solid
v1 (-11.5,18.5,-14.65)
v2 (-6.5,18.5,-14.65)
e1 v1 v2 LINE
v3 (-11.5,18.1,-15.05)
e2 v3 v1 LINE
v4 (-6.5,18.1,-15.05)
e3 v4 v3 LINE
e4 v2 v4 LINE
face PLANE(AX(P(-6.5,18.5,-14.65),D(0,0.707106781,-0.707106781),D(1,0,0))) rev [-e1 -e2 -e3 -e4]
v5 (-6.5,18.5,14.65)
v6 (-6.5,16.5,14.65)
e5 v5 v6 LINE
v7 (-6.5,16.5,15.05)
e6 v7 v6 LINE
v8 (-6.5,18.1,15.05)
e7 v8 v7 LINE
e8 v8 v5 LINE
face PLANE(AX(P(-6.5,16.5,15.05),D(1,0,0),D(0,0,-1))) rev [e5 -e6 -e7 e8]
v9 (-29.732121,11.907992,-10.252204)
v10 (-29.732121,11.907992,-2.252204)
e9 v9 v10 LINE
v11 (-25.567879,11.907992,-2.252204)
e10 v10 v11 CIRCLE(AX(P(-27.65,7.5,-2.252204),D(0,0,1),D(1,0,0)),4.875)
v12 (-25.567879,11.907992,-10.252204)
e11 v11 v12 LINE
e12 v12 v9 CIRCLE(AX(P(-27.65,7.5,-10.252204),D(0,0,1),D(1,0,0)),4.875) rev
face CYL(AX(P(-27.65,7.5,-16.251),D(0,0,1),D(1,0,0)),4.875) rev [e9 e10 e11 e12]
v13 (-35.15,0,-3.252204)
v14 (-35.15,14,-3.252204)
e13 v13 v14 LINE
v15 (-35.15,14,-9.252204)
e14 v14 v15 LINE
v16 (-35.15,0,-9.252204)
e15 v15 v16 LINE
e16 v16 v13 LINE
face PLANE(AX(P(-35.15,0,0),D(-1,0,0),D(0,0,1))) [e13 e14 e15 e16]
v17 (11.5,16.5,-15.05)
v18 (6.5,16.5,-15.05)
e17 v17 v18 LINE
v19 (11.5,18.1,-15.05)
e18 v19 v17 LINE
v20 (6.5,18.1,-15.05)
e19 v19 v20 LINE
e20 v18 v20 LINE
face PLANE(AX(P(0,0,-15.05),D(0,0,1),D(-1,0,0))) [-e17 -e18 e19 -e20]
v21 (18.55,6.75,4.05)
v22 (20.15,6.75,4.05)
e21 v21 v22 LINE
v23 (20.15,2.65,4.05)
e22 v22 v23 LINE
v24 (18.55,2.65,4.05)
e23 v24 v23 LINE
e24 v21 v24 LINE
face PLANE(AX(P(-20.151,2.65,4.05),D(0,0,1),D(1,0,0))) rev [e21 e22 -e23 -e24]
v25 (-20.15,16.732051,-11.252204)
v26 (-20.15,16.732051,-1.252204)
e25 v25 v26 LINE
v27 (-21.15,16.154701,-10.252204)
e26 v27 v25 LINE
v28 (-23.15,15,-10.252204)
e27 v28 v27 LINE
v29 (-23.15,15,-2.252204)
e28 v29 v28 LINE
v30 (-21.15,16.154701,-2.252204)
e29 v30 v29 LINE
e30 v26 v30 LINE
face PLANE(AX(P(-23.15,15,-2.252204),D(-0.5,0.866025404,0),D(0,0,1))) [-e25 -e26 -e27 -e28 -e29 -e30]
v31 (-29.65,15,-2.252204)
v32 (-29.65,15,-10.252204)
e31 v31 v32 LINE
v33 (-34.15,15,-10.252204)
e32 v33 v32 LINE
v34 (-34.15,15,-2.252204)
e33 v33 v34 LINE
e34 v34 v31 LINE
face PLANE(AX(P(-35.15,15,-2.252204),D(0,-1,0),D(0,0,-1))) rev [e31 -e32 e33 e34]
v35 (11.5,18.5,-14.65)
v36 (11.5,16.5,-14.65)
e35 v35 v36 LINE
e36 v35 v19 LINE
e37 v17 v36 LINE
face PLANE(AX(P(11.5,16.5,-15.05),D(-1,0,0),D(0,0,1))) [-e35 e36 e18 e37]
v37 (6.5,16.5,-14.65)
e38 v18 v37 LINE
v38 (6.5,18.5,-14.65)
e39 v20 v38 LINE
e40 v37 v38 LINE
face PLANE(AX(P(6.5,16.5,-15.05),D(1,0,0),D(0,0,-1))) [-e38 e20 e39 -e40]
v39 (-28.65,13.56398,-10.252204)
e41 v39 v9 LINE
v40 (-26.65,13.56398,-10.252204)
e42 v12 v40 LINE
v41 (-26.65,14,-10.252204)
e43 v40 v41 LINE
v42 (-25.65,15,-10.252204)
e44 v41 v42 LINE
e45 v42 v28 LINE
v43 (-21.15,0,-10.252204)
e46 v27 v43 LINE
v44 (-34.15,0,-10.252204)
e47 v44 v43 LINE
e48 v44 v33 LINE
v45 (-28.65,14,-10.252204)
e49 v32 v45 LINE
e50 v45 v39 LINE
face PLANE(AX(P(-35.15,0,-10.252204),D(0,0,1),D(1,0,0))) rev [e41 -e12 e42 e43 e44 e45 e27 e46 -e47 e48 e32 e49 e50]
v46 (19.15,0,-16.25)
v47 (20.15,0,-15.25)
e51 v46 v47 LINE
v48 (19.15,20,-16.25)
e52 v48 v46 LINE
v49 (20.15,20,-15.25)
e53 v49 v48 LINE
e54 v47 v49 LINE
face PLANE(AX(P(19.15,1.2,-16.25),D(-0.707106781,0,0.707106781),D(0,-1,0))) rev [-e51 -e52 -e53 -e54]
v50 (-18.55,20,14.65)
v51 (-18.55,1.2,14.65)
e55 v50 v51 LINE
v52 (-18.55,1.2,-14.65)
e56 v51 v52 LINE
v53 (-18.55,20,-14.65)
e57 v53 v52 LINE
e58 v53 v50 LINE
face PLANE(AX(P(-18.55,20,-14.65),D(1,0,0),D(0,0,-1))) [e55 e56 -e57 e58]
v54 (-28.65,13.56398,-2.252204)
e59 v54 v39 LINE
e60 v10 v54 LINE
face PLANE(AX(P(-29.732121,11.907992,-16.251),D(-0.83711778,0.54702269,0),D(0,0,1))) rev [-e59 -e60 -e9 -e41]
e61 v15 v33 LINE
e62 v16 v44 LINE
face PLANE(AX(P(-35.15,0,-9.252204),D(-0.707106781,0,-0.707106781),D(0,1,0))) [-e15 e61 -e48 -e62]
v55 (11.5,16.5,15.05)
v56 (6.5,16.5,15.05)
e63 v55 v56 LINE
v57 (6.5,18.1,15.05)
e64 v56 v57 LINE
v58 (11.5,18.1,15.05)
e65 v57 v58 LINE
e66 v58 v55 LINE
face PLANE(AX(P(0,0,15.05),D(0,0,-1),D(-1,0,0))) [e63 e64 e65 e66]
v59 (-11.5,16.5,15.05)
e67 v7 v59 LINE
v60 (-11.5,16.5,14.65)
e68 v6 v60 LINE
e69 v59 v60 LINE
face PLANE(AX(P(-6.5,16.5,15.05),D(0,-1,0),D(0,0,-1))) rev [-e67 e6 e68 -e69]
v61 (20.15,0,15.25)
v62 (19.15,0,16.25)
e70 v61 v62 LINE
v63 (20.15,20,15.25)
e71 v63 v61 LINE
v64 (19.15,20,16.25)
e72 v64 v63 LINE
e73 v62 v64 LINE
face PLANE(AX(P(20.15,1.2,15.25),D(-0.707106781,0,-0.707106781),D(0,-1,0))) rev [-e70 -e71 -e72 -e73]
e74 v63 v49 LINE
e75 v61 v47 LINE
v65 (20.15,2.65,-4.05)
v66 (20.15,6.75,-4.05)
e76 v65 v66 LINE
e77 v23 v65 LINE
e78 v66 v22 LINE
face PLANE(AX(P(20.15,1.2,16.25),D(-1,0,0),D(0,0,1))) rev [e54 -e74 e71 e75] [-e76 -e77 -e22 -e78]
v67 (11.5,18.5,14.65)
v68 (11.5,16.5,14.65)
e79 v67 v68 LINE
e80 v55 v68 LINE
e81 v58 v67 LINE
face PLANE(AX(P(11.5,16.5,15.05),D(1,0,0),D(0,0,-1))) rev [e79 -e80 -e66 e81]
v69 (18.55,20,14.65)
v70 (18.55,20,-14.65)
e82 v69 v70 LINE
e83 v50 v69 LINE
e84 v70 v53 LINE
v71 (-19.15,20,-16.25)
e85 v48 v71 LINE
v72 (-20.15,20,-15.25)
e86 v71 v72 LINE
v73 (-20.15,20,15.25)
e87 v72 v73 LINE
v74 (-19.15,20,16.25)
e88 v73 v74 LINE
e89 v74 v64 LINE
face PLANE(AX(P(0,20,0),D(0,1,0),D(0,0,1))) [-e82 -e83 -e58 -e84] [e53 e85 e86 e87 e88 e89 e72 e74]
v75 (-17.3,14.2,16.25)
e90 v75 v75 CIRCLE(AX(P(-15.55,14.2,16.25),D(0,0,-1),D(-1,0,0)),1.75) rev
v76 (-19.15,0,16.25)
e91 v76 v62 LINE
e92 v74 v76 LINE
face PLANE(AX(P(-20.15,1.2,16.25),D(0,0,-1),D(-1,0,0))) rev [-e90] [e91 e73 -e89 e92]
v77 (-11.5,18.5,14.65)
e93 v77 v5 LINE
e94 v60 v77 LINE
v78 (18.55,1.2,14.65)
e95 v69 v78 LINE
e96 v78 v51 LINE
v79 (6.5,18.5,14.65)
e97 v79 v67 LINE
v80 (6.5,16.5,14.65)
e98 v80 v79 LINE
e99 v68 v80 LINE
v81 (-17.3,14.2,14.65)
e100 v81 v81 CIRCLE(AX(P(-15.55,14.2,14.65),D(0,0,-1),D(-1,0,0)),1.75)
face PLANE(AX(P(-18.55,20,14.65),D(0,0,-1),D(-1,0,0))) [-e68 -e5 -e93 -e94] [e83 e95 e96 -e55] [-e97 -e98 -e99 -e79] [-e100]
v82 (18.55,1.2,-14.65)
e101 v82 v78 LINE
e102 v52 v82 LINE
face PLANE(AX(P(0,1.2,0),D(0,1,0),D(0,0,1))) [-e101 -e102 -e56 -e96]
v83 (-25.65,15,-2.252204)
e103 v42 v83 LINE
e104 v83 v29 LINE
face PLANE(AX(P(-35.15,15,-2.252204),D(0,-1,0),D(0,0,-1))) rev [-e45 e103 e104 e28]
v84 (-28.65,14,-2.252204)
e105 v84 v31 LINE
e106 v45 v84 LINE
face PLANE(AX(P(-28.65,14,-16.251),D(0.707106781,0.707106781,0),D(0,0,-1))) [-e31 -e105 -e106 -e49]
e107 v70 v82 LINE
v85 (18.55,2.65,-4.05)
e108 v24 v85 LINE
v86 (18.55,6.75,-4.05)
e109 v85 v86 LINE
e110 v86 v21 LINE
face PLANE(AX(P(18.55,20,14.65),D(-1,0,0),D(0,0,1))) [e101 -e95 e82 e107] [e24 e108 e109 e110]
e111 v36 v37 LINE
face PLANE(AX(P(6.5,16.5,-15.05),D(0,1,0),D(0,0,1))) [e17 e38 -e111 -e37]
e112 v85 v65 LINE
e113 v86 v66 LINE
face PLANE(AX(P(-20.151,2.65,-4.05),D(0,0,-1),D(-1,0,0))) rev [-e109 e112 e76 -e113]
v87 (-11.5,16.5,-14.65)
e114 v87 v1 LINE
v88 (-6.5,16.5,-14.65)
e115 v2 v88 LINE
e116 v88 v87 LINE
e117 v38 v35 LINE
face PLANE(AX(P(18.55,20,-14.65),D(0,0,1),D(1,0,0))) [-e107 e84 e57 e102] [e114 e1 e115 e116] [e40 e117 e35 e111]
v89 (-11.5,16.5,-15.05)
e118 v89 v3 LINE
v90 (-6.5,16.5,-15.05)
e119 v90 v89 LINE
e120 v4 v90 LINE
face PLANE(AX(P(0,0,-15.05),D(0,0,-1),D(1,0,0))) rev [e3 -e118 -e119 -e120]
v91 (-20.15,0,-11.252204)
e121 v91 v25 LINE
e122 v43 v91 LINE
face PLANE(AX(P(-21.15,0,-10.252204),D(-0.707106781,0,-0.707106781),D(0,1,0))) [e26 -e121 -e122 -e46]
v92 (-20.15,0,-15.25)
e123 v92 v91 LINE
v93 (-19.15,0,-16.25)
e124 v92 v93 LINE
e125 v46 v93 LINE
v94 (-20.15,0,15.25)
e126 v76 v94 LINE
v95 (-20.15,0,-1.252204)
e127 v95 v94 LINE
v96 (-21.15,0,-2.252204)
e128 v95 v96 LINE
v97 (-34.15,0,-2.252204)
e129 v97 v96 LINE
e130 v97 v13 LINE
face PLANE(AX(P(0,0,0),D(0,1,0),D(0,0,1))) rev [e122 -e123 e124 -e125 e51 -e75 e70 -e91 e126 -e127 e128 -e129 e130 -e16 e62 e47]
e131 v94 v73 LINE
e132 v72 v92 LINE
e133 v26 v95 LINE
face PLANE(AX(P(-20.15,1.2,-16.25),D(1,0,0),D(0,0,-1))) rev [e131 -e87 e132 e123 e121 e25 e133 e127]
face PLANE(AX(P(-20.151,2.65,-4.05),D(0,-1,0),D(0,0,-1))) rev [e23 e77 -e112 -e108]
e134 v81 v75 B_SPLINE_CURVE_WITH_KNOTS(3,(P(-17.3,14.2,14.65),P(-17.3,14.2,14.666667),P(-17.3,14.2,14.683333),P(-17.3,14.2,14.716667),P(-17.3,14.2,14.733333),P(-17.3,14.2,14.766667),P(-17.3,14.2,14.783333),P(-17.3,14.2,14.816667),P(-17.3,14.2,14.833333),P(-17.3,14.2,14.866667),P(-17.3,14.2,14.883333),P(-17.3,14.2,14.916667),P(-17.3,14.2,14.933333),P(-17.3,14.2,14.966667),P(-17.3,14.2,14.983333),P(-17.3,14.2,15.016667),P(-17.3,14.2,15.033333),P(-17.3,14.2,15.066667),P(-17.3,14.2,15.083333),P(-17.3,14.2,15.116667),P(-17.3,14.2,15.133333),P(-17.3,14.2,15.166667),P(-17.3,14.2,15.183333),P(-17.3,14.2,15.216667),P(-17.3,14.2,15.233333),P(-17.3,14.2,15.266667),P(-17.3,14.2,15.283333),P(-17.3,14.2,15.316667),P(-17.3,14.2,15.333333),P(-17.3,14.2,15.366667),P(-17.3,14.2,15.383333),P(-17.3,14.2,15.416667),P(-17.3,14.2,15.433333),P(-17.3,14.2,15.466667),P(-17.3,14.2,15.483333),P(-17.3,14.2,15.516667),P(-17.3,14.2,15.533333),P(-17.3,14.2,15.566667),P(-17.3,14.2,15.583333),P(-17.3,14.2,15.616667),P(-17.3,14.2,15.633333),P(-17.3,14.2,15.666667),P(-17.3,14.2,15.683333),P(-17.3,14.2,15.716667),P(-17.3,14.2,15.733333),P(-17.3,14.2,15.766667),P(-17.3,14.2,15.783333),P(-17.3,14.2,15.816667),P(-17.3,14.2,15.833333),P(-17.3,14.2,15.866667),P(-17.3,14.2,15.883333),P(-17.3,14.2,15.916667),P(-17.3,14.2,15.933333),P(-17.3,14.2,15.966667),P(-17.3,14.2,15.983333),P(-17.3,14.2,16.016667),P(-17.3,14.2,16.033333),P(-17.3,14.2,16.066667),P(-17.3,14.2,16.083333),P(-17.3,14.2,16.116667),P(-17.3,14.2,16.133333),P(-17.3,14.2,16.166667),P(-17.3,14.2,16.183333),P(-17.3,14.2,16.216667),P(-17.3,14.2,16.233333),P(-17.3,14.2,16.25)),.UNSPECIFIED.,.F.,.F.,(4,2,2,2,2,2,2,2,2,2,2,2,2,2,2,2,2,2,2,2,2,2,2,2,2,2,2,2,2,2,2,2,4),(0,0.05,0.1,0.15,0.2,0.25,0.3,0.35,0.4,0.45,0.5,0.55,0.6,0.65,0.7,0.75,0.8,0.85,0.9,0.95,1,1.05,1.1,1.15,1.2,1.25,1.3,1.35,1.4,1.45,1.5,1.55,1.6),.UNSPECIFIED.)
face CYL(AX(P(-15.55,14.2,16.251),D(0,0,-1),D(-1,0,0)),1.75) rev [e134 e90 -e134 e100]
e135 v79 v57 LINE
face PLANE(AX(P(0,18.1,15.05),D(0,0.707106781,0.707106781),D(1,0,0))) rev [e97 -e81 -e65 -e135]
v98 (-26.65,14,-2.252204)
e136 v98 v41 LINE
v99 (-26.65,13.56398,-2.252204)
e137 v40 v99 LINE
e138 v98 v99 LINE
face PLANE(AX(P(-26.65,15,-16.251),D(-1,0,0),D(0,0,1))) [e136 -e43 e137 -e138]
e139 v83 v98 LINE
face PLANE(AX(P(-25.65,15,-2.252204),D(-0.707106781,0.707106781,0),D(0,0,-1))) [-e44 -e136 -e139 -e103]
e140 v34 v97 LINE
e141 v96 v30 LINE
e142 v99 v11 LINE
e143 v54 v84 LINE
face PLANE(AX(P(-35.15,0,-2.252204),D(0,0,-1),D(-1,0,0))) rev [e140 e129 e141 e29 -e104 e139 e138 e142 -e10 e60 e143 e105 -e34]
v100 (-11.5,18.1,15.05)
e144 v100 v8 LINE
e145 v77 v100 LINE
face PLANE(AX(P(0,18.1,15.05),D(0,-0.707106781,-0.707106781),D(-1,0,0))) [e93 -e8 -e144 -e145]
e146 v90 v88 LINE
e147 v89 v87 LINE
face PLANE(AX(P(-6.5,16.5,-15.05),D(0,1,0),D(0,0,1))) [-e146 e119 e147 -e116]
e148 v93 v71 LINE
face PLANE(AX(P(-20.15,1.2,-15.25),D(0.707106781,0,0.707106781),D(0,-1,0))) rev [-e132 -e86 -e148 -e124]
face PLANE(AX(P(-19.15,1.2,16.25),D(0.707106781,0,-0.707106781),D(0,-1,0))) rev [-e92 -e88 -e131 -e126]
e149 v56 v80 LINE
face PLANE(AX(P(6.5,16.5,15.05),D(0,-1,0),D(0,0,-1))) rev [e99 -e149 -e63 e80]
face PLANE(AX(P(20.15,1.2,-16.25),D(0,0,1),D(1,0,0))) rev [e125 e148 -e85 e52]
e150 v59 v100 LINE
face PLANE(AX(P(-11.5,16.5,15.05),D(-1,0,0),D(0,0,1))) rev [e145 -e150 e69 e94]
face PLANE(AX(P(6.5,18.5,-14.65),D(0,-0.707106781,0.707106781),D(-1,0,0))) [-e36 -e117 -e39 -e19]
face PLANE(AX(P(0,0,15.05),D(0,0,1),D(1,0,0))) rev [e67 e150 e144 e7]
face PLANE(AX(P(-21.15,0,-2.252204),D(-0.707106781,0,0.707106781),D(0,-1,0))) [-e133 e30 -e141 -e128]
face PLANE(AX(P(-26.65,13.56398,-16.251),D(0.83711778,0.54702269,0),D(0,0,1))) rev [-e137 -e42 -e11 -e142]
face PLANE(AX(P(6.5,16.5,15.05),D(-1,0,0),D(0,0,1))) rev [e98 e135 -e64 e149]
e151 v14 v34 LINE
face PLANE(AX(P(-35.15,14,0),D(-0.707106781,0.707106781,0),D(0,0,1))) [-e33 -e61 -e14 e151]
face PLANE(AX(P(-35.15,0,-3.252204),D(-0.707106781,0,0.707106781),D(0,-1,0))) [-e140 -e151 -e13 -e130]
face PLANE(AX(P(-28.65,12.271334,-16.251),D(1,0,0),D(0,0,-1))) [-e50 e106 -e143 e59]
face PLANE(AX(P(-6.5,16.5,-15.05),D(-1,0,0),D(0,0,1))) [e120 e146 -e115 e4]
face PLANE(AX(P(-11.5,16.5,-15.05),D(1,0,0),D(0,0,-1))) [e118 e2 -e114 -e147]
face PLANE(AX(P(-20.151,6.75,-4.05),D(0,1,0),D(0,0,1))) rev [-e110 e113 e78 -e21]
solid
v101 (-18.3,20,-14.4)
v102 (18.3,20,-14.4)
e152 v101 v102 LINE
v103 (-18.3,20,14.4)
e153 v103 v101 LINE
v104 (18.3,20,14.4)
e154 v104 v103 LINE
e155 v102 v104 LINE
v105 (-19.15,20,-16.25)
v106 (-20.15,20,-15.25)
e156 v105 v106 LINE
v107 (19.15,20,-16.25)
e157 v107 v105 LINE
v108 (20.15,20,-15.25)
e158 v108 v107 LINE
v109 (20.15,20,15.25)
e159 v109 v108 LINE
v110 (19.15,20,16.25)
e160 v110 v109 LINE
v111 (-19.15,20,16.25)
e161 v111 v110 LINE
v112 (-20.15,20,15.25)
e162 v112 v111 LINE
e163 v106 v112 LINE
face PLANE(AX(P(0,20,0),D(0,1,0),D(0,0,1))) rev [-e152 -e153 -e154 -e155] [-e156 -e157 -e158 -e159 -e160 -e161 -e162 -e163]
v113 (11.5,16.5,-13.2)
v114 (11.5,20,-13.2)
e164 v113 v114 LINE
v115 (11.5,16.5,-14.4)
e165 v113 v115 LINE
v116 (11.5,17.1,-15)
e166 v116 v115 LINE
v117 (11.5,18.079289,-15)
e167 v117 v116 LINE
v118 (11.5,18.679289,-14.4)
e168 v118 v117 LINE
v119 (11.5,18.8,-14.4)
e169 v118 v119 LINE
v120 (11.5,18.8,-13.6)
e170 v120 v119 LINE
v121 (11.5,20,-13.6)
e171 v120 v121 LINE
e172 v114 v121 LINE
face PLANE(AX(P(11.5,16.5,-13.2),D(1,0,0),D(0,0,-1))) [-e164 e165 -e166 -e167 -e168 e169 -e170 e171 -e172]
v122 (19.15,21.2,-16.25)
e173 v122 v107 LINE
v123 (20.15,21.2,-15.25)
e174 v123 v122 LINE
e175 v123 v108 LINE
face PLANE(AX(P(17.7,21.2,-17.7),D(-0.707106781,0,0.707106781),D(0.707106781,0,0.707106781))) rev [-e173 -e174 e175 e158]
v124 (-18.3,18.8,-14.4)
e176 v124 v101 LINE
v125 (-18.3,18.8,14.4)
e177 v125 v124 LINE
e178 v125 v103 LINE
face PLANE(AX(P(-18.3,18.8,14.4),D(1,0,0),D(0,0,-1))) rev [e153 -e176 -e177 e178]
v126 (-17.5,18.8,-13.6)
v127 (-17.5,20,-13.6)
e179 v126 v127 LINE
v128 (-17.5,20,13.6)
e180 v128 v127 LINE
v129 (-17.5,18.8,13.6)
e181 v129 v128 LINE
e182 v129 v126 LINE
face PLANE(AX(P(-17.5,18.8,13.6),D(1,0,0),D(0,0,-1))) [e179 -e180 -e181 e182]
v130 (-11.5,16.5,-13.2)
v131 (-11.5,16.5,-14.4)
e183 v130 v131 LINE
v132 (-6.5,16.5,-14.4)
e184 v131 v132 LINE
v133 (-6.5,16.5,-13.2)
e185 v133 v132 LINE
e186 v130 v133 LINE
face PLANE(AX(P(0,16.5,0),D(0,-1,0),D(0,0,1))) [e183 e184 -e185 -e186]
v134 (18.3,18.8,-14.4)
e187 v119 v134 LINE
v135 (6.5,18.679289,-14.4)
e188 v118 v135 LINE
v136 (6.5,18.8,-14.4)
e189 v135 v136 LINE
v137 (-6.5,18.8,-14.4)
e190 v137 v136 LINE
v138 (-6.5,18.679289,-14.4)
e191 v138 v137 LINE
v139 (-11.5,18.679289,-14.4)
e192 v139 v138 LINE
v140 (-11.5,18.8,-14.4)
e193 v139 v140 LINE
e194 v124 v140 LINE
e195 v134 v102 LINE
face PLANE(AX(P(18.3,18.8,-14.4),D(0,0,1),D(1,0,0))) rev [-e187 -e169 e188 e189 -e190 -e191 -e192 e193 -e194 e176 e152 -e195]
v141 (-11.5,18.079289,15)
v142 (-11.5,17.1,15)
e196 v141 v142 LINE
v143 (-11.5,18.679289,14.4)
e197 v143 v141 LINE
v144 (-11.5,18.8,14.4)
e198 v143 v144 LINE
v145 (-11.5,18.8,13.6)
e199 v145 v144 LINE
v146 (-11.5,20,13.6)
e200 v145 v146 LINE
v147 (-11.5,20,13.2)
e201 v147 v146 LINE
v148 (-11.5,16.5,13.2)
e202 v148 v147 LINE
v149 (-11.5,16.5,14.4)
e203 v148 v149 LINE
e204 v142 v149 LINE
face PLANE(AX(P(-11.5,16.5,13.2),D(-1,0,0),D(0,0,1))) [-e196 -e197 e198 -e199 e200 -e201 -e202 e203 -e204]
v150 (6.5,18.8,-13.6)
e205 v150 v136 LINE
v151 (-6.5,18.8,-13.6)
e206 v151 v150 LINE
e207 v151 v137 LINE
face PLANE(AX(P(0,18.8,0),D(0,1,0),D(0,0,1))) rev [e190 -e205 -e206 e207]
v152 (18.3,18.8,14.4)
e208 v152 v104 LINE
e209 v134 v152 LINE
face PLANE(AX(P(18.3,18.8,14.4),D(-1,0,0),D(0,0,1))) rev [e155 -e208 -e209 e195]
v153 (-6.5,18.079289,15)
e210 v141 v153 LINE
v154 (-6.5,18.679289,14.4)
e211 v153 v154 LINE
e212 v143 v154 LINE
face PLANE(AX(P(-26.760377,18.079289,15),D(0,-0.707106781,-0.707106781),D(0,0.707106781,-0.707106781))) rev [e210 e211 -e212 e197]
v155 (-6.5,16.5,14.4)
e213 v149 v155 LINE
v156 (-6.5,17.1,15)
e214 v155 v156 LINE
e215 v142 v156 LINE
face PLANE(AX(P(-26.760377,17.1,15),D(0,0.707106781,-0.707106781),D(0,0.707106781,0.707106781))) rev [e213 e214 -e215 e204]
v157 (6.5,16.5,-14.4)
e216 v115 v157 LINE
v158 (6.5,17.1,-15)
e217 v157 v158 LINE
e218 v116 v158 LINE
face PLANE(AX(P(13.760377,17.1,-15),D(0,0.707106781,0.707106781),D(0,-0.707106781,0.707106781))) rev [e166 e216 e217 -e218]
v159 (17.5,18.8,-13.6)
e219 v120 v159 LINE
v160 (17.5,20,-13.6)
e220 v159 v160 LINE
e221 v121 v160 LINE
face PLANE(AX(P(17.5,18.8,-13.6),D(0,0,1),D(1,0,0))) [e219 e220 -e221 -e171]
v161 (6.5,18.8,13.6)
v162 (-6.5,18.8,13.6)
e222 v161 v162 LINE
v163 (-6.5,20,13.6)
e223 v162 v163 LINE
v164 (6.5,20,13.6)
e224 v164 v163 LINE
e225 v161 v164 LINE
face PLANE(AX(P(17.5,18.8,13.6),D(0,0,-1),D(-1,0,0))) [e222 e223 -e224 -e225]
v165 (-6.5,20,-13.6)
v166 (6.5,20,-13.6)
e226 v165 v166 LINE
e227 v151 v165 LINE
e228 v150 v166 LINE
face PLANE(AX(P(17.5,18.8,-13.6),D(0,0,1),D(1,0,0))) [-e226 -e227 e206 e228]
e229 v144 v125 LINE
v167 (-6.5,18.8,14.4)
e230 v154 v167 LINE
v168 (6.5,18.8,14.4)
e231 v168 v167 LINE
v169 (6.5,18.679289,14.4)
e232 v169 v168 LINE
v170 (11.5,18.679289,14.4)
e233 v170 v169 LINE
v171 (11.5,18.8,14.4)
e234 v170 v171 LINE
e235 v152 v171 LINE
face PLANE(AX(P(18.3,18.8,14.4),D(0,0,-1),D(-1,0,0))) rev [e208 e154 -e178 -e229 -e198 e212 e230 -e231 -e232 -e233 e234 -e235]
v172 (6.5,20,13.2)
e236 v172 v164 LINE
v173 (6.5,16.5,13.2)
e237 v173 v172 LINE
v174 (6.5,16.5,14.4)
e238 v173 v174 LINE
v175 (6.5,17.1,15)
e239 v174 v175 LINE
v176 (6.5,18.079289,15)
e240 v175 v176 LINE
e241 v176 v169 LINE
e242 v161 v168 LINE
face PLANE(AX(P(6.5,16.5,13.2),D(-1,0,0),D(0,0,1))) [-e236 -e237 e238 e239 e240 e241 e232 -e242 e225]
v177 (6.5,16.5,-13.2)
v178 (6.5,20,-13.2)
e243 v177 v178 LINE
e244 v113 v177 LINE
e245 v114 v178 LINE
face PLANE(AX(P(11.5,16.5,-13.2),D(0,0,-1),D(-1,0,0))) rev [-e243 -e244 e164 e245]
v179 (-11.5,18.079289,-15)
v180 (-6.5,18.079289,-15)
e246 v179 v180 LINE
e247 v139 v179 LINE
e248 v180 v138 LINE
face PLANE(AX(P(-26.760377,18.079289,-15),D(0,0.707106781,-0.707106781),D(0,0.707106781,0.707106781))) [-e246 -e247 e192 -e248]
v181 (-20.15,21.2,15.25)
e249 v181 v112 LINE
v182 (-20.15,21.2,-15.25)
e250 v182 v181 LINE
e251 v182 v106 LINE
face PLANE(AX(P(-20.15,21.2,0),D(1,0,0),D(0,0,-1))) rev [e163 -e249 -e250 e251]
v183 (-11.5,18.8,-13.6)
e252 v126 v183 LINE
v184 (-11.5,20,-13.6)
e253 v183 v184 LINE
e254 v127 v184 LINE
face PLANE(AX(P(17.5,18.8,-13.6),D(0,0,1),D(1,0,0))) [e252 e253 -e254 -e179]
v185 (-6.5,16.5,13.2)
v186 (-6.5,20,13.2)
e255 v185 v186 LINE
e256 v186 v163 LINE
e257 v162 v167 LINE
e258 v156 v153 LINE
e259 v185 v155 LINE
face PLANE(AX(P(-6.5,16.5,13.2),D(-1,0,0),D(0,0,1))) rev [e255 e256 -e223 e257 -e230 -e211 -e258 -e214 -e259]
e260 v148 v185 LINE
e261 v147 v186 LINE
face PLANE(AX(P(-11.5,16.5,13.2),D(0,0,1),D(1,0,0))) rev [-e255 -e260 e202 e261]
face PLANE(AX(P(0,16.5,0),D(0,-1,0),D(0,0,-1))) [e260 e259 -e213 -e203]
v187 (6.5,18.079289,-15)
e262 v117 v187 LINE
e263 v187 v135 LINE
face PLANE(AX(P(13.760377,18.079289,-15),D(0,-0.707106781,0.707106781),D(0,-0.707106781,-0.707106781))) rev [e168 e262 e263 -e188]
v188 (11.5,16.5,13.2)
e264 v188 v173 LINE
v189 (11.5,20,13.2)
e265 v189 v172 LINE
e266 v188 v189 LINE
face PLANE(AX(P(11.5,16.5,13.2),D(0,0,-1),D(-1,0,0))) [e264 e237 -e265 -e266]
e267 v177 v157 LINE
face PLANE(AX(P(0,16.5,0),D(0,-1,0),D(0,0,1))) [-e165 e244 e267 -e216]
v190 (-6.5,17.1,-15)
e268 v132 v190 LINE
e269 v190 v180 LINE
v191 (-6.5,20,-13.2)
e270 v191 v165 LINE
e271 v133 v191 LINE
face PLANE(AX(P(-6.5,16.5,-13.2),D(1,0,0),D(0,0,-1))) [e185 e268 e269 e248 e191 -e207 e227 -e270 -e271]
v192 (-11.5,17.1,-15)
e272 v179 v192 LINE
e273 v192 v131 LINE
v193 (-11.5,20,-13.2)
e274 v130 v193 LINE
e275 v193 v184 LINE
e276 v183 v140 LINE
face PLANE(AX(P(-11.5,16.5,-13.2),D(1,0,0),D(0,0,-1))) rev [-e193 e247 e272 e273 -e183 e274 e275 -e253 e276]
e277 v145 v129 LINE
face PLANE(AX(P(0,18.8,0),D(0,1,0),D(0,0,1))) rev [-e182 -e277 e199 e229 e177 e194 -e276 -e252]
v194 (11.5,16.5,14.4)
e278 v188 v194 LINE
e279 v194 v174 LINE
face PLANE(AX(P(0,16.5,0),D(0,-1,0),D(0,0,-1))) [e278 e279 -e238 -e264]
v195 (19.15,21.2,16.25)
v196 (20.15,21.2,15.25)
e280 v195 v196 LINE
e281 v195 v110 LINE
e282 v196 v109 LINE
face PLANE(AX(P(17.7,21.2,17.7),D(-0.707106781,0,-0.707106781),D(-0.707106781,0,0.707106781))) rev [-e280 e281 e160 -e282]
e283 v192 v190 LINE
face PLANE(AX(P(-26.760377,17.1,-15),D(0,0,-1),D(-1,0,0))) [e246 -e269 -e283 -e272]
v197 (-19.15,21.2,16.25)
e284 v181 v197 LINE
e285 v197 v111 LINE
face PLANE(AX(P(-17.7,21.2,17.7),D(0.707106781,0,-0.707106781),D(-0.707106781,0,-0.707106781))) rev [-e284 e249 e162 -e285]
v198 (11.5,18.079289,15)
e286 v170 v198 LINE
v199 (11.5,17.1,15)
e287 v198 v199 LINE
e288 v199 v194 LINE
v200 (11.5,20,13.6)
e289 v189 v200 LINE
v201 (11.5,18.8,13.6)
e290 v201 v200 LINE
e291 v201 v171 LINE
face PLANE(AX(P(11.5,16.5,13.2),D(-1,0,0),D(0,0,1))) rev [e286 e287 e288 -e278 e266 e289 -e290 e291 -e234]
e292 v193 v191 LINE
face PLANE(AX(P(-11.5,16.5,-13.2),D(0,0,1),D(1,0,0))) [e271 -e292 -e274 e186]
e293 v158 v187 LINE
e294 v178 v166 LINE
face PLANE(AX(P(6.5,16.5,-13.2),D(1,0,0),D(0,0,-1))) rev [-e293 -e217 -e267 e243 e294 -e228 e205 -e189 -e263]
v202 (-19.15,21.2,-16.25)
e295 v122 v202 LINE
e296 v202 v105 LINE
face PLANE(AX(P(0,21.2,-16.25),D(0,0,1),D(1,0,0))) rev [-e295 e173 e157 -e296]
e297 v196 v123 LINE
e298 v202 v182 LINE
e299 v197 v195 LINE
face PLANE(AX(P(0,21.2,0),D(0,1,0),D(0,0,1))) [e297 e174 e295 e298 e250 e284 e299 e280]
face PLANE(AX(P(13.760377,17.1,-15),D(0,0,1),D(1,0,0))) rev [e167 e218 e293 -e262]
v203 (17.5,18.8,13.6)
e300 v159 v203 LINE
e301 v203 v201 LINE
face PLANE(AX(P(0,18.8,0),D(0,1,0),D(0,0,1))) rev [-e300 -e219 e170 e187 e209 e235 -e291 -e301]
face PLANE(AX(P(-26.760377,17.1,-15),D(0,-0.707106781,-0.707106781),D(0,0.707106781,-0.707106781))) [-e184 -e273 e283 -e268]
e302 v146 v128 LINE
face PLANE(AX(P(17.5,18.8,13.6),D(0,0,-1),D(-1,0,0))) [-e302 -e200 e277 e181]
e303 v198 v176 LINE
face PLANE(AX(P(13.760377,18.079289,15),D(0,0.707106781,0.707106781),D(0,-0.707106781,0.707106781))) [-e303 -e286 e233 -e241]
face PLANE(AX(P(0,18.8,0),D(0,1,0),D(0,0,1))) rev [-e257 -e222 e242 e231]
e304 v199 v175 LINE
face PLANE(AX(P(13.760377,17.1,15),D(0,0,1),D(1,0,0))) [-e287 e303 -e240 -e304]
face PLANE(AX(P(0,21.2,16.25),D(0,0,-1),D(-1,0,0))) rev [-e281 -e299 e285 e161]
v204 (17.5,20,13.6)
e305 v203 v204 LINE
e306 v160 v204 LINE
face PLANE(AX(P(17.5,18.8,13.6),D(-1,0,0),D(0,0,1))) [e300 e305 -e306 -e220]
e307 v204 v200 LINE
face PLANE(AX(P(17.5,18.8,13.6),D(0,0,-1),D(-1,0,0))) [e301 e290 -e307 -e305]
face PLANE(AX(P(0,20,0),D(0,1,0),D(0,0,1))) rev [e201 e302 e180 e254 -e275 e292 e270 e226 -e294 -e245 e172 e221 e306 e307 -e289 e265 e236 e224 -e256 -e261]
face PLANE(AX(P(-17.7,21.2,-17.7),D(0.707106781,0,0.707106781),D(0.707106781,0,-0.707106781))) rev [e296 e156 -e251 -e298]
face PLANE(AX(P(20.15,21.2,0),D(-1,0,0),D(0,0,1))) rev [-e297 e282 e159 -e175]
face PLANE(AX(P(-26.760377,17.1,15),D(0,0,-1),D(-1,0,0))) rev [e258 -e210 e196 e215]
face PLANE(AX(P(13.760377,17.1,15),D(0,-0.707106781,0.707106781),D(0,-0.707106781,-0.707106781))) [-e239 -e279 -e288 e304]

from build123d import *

# Parameters (mm, degrees)
SKETCH2_W                = 40.3
SKETCH2_H                = 32.5
BOSS_EXTRUDE1_DEPTH      = 1.2
SKETCH2_3_W              = 40.3
SKETCH2_3_H              = 32.5
SKETCH2_3_W_2            = 37.1
SKETCH2_3_H_2            = 29.3
BOSS_EXTRUDE2_DEPTH      = 20
CUT_EXTRUDE1_REACH       = 49.835
SKETCH3_W                = 8.1
SKETCH3_H                = 4.1
CHAMFER1_SIZE            = 1
SKETCH4_W                = 8
SKETCH4_H                = 15
BOSS_EXTRUDE3_DEPTH      = 15
CUT_EXTRUDE3_REACH       = 46.473
CHAMFER2_SIZE            = 1.292646163
CHAMFER2_SIZE_2          = 1
CHAMFER3_SIZE            = 1
SKETCH6_W                = 5
SKETCH6_H                = 2
CUT_EXTRUDE4_DEPTH       = 0.4
CHAMFER4_SIZE            = 0.4
CHAMFER4_OF_MIRROR1_SIZE = 0.4
BOSS_EXTRUDE4_DEPTH      = 1.2
SKETCH8_W                = 36.6
SKETCH8_H                = 28.8
SKETCH8_W_2              = 35
SKETCH8_H_2              = 27.2
BOSS_EXTRUDE5_DEPTH      = 1.2
SKETCH10_W               = 5
SKETCH10_H               = 1.2
BOSS_EXTRUDE6_DEPTH      = 3.5
BOSS_EXTRUDE7_DEPTH      = 5
MIRROR7_COPY_1_SKETCH_W  = 5
MIRROR7_COPY_1_SKETCH_H  = 1.2
MIRROR7_COPY_1_DEPTH     = 3.5
MIRROR7_COPY_2_DEPTH     = 5
SKETCH15_R               = 1.75
CUT_EXTRUDE6_DEPTH       = 1.6
CHAMFER6_SIZE2           = 3
CHAMFER6_SIZE            = 1.732050808


# Some blends are built 0.0001 mm under size
with BuildPart() as part:
    # Sketch2 → Boss-Extrude1 (new body)
    with BuildSketch(Plane(origin=(0, 0, 0), x_dir=(1, 0, 0), z_dir=(0, 1, 0))):
        Rectangle(SKETCH2_W, SKETCH2_H)
    extrude(amount=BOSS_EXTRUDE1_DEPTH)

    # Sketch2<3> → Boss-Extrude2 (add)
    with BuildSketch(Plane(origin=(0, 0, 0), x_dir=(1, 0, 0), z_dir=(0, 1, 0))):
        Rectangle(SKETCH2_3_W, SKETCH2_3_H)
        Rectangle(SKETCH2_3_W_2, SKETCH2_3_H_2, mode=Mode.SUBTRACT)
    extrude(amount=BOSS_EXTRUDE2_DEPTH)

    # Sketch3 → Cut-Extrude1 (cut, up to next)
    with BuildSketch(Plane(origin=(20.15, 0, 0), x_dir=(0, 0, -1), z_dir=(1, 0, 0)), mode=Mode.PRIVATE) as cut_extrude1_sk1:
        with Locations((0, 4.7)):
            Rectangle(SKETCH3_W, SKETCH3_H)
    cut_extrude1_tool1 = extrude(cut_extrude1_sk1.sketch, amount=-CUT_EXTRUDE1_REACH, mode=Mode.PRIVATE) & part.part
    add(cut_extrude1_tool1.solids().sort_by_distance((20.15, 4.7, 0))[0], mode=Mode.SUBTRACT)

    # Chamfer1
    chamfer1_edges = [part.edges().sort_by_distance(p)[0] for p in [
        (-20.15, 10, -16.25),
        (20.15, 10, -16.25),
        (20.15, 10, 16.25),
        (-20.15, 10, 16.25),
    ]]
    chamfer(chamfer1_edges, length=CHAMFER1_SIZE)

    # Sketch4 → Boss-Extrude3 (add)
    with BuildSketch(Plane.ZY.offset(20.15)):
        with Locations((-6.25220384, 7.5)):
            Rectangle(SKETCH4_W, SKETCH4_H)
    extrude(amount=BOSS_EXTRUDE3_DEPTH)

    # Sketch5 → Cut-Extrude3 (cut, up to next)
    with BuildSketch(Plane.XY.offset(-2.25220384), mode=Mode.PRIVATE) as cut_extrude3_sk1:
        with BuildLine():
            Line((-28.65, 12.271333671), (-28.65, 15))
            Line((-28.65, 15), (-26.65, 15))
            Line((-26.65, 15), (-26.65, 12.271333671))
            ThreePointArc((-26.65, 12.271333671), (-27.65, 2.625), (-28.65, 12.271333671))
        make_face()
    cut_extrude3_tool1 = extrude(cut_extrude3_sk1.sketch, amount=-CUT_EXTRUDE3_REACH, mode=Mode.PRIVATE) & part.part
    add(cut_extrude3_tool1.solids().sort_by_distance((-27.65, 7.91032, -2.252204))[0], mode=Mode.SUBTRACT)

    # Chamfer2
    # the kernel refuses this chamfer: 1.292646163, 1 mm, written as the material it takes off along each edge
    with BuildSketch(Plane(origin=(-28.65, 12.271333671, 1.088369735), x_dir=(-0.9479887076176806, -0.3183039588653585, 0), z_dir=(0, 0, -1))) as chamfer2_piece_1:
        with BuildLine():
            Line((1.141491378, 0), (-CHAMFER2_SIZE * 0.318303958917, CHAMFER2_SIZE * 0.947988707772))
            Line((-CHAMFER2_SIZE * 0.318303958917, CHAMFER2_SIZE * 0.947988707772), (0, 0))
            ThreePointArc((0, 0), (0.591249169, 0.033482483), (1.141491378, 0))
        make_face()
    extrude(amount=14.68114715, mode=Mode.SUBTRACT)
    with BuildSketch(Plane(origin=(-28.65, 15, 0.319479148), x_dir=(0, -1, 0), z_dir=(0, 0, -1)), Plane(origin=(-26.65, 15, 0.319479148), x_dir=(1, 0, 0), z_dir=(0, 0, -1))) as chamfer2_piece_2:
        Polygon((CHAMFER2_SIZE_2, 0), (0, CHAMFER2_SIZE_2), (0, 0), align=None)
    extrude(amount=13.143365976, mode=Mode.SUBTRACT)
    with BuildSketch(Plane(origin=(-26.65, 12.271333671, 1.088369735), x_dir=(0, 1, 0), z_dir=(0, 0, -1))) as chamfer2_piece_3:
        with BuildLine():
            Line((CHAMFER2_SIZE, 0), (-0.363341225, 1.082120936))
            ThreePointArc((-0.363341225, 1.082120936), (-0.156455935, 0.571155143), (0, 0))
            Line((0, 0), (CHAMFER2_SIZE, 0))
        make_face()
    extrude(amount=14.68114715, mode=Mode.SUBTRACT)

    # Chamfer3
    chamfer3_edges = [part.edges().sort_by_distance(p)[0] for p in [
        (-20.15, 7.5, -10.25220384),
        (-20.15, 7.5, -2.25220384),
        (-35.15, 7.5, -10.25220384),
        (-35.15, 7.5, -2.25220384),
        (-35.15, 15, -6.25220384),
    ]]
    chamfer(chamfer3_edges, length=CHAMFER3_SIZE)

    # Sketch6 → Cut-Extrude4 (cut)
    with BuildSketch(Plane(origin=(0, 0, 14.65), x_dir=(-1, 0, 0), z_dir=(0, 0, -1))):
        with Locations((-9, 17.5)):
            Rectangle(SKETCH6_W, SKETCH6_H)
        with Locations((9, 17.5)):
            Rectangle(SKETCH6_W, SKETCH6_H)
    cut_extrude4 = extrude(amount=-CUT_EXTRUDE4_DEPTH, mode=Mode.SUBTRACT)

    # Chamfer4
    chamfer4_edges = [part.edges().sort_by_distance(p)[0] for p in [
        (9, 18.5, 15.05),
        (-9, 18.5, 15.05),
    ]]
    chamfer(chamfer4_edges, length=CHAMFER4_SIZE - 0.0001)  # a hair under: the kernel refuses the full size

    # Mirror1: Cut-Extrude4 across plane
    add(cut_extrude4.mirror(Plane.XY), mode=Mode.SUBTRACT)

    # Chamfer4 of Mirror1
    chamfer4_of_mirror1_edges = [part.edges().sort_by_distance(p)[0] for p in [
        (9, 18.5, -15.05),
        (-9, 18.5, -15.05),
    ]]
    chamfer(chamfer4_of_mirror1_edges, length=CHAMFER4_OF_MIRROR1_SIZE - 0.0001)  # a hair under: the kernel refuses the full size

    # Sketch15 → Cut-Extrude6 (cut)
    with BuildSketch(Plane(origin=(0, 0, 14.65), x_dir=(-1, 0, 0), z_dir=(0, 0, -1))):
        with Locations((15.55, 14.2)):
            Circle(SKETCH15_R)
    extrude(amount=-CUT_EXTRUDE6_DEPTH, mode=Mode.SUBTRACT)

    # Chamfer6
    chamfer6_edges = [part.edges().sort_by_distance(p)[0] for p in [
        (-20.15, 15, -6.25220384),
    ]]
    chamfer6_side = [part.faces().sort_by_distance(p)[0] for p in [
        (-20.15, 15.034641016, -6.25220384),
    ]]
    chamfer(chamfer6_edges, length=CHAMFER6_SIZE - 0.0001, length2=CHAMFER6_SIZE2 - 0.0001, reference=chamfer6_side[0])  # a hair under: the kernel refuses the full size


with BuildPart() as body_2:
    # Sketch7 → Boss-Extrude4 (new body)
    with BuildSketch(Plane(origin=(0, 20, 0), x_dir=(1, 0, 0), z_dir=(0, 1, 0))):
        Polygon((-19.15, 16.25), (-20.15, 15.25), (-20.15, -15.25), (-19.15, -16.25), (19.15, -16.25), (20.15, -15.25), (20.15, 15.25), (19.15, 16.25), align=None)
    extrude(amount=BOSS_EXTRUDE4_DEPTH)

    # Sketch8 → Boss-Extrude5 (add)
    with BuildSketch(Plane.XZ.offset(-20)):
        Rectangle(SKETCH8_W, SKETCH8_H)
        Rectangle(SKETCH8_W_2, SKETCH8_H_2, mode=Mode.SUBTRACT)
    extrude(amount=BOSS_EXTRUDE5_DEPTH)

    # Sketch10 → Boss-Extrude6 (add)
    with BuildSketch(Plane.XZ.offset(-20)):
        with Locations((9, 13.8)):
            Rectangle(SKETCH10_W, SKETCH10_H)
    boss_extrude6 = extrude(amount=BOSS_EXTRUDE6_DEPTH)

    # Sketch13 → Boss-Extrude7 (add)
    with BuildSketch(Plane.ZY.offset(-6.5)):
        Polygon((15, 18.079289322), (14.4, 18.679289322), (14.4, 16.5), (15, 17.1), align=None)
    boss_extrude7 = extrude(amount=-BOSS_EXTRUDE7_DEPTH)

    # Mirror6: Boss-Extrude6, Boss-Extrude7 across plane
    add(boss_extrude6.mirror(Plane.ZY))
    add(boss_extrude7.mirror(Plane.ZY))

    # Mirror7: Boss-Extrude6, Boss-Extrude7 across plane
    add(boss_extrude6.mirror(Plane.XY))
    add(boss_extrude7.mirror(Plane.XY))

    # Mirror7 copy 1 sketch → Mirror7 copy 1 (add)
    with BuildSketch(Plane(origin=(0, 20, 0), x_dir=(-1, 0, 0), z_dir=(0, -1, 0))):
        with Locations((9, 13.8)):
            Rectangle(MIRROR7_COPY_1_SKETCH_W, MIRROR7_COPY_1_SKETCH_H)
    extrude(amount=MIRROR7_COPY_1_DEPTH)

    # Mirror7 copy 2 sketch → Mirror7 copy 2 (add)
    with BuildSketch(Plane(origin=(-6.5, 0, 0), x_dir=(0, 0, -1), z_dir=(1, 0, 0))):
        Polygon((15, 18.079289322), (14.4, 18.679289322), (14.4, 16.5), (15, 17.1), align=None)
    extrude(amount=-MIRROR7_COPY_2_DEPTH)


solid = Compound([part.part, body_2.part])
